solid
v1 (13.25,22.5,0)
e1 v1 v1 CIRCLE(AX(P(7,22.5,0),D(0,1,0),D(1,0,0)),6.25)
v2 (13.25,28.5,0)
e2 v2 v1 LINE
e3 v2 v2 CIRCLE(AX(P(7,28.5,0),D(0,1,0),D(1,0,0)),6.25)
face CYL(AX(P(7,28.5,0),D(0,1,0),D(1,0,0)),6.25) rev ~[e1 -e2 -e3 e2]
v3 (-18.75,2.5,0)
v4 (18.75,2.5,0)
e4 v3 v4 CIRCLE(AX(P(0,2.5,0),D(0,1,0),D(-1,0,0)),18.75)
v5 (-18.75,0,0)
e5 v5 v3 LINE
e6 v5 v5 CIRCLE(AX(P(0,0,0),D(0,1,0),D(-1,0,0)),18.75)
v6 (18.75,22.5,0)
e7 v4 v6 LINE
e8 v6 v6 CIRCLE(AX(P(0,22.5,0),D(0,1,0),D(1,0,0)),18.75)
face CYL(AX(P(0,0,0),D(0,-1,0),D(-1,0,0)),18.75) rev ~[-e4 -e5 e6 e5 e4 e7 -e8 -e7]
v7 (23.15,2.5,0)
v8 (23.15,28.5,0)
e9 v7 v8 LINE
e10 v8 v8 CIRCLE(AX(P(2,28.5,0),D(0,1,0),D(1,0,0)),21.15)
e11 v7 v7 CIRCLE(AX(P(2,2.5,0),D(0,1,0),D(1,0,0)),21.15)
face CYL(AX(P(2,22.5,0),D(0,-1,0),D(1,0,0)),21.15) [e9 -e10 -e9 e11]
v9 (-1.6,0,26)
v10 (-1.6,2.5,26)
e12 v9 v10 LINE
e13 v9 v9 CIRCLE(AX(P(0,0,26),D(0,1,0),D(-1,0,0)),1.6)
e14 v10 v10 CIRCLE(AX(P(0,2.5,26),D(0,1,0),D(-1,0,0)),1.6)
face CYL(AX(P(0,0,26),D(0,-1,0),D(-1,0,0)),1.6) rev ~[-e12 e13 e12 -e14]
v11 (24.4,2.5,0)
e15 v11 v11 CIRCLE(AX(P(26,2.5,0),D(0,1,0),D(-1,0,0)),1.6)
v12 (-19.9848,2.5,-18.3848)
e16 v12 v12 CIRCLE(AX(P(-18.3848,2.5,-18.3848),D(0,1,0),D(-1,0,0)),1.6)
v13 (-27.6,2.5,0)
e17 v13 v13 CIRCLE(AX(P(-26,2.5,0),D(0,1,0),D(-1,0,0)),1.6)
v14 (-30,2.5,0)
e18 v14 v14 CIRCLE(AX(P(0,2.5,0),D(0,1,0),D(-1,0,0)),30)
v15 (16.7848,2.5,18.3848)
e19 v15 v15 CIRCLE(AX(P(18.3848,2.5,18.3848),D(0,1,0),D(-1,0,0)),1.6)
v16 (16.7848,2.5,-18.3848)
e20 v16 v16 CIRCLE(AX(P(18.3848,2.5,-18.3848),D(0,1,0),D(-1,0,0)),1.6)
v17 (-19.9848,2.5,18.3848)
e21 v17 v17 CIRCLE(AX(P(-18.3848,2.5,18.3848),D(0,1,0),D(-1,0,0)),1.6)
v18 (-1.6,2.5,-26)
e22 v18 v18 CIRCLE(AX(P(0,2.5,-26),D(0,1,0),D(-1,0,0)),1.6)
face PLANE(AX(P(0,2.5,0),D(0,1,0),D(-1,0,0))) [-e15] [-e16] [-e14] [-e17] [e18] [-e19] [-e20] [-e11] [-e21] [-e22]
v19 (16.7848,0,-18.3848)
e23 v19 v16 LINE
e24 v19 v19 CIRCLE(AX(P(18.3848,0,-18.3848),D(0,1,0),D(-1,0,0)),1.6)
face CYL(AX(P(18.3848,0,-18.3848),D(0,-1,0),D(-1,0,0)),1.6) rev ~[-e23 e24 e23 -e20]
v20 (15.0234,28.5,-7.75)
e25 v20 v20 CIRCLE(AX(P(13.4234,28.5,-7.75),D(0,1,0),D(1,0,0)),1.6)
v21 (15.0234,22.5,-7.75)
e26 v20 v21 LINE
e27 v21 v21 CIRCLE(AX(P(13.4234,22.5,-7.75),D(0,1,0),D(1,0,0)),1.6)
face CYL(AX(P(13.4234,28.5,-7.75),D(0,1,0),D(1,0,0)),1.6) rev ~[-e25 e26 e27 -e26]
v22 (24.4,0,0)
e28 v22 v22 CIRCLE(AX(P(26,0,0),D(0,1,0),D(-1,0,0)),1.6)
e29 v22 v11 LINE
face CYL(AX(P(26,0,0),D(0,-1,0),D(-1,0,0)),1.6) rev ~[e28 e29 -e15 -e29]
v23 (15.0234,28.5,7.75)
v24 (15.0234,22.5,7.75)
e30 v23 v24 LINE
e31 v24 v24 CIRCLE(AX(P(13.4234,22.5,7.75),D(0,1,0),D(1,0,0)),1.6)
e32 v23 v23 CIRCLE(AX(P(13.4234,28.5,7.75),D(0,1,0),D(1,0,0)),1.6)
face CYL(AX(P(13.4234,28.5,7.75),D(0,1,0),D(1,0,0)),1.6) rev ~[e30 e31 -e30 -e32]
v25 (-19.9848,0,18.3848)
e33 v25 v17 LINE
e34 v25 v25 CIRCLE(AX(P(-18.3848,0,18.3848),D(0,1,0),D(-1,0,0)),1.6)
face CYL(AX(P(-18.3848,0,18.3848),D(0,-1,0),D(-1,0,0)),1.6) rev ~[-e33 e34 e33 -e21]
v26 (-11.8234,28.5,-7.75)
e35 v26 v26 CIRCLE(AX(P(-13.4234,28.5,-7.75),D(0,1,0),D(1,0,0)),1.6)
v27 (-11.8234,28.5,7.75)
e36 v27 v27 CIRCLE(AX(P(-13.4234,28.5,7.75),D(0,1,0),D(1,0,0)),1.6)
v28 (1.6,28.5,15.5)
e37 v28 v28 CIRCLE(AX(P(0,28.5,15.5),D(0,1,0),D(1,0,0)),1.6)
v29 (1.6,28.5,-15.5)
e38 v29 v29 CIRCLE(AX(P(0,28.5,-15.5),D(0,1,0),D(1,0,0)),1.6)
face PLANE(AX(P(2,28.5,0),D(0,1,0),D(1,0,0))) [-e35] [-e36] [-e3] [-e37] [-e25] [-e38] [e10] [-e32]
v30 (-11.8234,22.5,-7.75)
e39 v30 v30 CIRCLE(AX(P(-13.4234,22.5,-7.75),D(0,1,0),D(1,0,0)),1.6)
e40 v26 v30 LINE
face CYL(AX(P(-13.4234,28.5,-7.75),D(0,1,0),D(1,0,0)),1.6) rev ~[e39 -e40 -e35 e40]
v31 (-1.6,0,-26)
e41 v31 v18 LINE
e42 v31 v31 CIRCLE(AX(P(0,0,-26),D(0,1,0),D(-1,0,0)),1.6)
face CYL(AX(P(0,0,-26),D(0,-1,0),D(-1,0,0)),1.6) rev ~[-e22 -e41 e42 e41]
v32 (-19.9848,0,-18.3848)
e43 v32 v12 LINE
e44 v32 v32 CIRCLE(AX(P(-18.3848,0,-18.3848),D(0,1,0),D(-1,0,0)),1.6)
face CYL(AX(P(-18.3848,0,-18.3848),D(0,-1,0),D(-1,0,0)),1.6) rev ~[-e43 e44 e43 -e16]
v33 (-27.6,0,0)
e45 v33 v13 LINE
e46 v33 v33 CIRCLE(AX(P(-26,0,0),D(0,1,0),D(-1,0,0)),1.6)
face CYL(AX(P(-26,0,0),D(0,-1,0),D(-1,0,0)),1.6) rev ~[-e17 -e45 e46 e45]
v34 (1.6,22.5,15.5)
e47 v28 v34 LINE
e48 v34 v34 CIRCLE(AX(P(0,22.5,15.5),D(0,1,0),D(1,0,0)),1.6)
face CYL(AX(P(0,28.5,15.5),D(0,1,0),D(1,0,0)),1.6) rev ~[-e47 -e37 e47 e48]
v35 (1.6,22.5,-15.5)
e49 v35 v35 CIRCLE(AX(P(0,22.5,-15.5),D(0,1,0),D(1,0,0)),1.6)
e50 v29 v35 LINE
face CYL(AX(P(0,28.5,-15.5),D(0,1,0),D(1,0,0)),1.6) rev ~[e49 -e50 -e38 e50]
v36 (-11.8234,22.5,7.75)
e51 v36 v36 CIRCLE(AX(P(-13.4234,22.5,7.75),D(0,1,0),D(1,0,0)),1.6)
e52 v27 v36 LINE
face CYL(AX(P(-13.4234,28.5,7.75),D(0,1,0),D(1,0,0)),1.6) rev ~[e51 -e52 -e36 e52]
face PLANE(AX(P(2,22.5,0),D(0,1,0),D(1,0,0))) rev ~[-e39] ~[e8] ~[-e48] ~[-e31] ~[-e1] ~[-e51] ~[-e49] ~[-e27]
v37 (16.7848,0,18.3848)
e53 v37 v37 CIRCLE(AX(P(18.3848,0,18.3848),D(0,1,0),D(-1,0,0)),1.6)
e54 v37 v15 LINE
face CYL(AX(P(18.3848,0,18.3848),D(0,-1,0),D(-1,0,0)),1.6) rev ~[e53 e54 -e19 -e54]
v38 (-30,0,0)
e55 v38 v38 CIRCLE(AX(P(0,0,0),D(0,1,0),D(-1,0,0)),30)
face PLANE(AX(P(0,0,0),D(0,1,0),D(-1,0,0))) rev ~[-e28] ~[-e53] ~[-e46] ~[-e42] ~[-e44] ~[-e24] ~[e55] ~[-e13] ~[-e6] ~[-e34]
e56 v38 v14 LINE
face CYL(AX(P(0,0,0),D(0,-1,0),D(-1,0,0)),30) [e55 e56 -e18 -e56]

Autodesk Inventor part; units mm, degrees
ref_plane "YZ Plane" through (0, 0, 0) normal (1, 0, 0) x (0, 1, 0)
ref_plane "XZ Plane" through (0, 0, 0) normal (0, 1, 0) x (-1, 0, 0)
ref_plane "XY Plane" through (0, 0, 0) normal (0, 0, 1) x (1, 0, 0)
sketch "Sketch2" plane through (0, 0, 0) normal (0, 1, 0) x (-1, 0, 0)
  circle A0 centre (0, 0) radius 18.75
  circle A1 centre (0, 0) radius 30
  circle A2 centre (26, 0) radius 1.6
  circle A3 centre (18.3848, -18.3848) radius 1.6
  circle A4 centre (0, -26) radius 1.6
  circle A5 centre (-18.3848, -18.3848) radius 1.6
  circle A6 centre (-26, 0) radius 1.6
  circle A7 centre (-18.3848, 18.3848) radius 1.6
  circle A8 centre (0, 26) radius 1.6
  circle A9 centre (18.3848, 18.3848) radius 1.6
  dimension "motorDiameter" = 37.5
  dimension "motorFixtureDiameter" = 60
  dimension "d20" = 3.2
  dimension "d21" = 26
  dimension "d24" = 0
  dimension "d27" = 360
extrude "Extrusion2" add sketch "Sketch2" along normal blind 2.5
sketch "Sketch3" plane through (0, 2.5, 0) normal (0, 1, 0) x (1, 0, 0)
  circle A0 centre (2, 0) radius 21.15
  circle A1 centre (0, 0) radius 18.75
  dimension "d31" = 2
  dimension "d32" = 42.3
  dimension "d33" = 37.5
  dimension "d34" = 0
extrude "Extrusion3" add sketch "Sketch3" along normal blind 20
sketch "Sketch4" plane through (2, 22.5, 0) normal (0, 1, 0) x (1, 0, 0)
  circle A0 centre (0, 0) radius 21.15 projected
  circle A1 centre (0, 0) radius 21.15
extrude "Extrusion4" add sketch "Sketch4" along normal blind 6
sketch "Sketch5" plane through (2, 28.5, 0) normal (0, 1, 0) x (1, 0, 0)
  circle A0 centre (-2, 0) radius 18.75 projected
  circle A1 centre (0, 0) radius 21.15 projected
  circle A2 centre (0, 0) radius 21.15 projected
  circle A3 centre (5, 0) radius 6.25
  circle A4 centre (-2, 15.5) radius 1.6
  circle A5 centre (-15.4234, 7.75) radius 1.6
  circle A6 centre (-15.4234, -7.75) radius 1.6
  circle A7 centre (-2, -15.5) radius 1.6
  circle A8 centre (11.4234, -7.75) radius 1.6
  circle A9 centre (11.4234, 7.75) radius 1.6
  dimension "d39" = 12.5
  dimension "d40" = 0
  dimension "d43" = 3.2
  dimension "d44" = 0
  dimension "d45" = 15.5
  dimension "d48" = 360
  dimension "d52" = 7
extrude "Extrusion5" cut sketch "Sketch5" against normal up to next contours A3 | A4 | A5 | A6 | A7 | A8 | A9
equation "\"d33\" = motorDiameter"
properties part number "motor fixture" material "ABS Plastic"
